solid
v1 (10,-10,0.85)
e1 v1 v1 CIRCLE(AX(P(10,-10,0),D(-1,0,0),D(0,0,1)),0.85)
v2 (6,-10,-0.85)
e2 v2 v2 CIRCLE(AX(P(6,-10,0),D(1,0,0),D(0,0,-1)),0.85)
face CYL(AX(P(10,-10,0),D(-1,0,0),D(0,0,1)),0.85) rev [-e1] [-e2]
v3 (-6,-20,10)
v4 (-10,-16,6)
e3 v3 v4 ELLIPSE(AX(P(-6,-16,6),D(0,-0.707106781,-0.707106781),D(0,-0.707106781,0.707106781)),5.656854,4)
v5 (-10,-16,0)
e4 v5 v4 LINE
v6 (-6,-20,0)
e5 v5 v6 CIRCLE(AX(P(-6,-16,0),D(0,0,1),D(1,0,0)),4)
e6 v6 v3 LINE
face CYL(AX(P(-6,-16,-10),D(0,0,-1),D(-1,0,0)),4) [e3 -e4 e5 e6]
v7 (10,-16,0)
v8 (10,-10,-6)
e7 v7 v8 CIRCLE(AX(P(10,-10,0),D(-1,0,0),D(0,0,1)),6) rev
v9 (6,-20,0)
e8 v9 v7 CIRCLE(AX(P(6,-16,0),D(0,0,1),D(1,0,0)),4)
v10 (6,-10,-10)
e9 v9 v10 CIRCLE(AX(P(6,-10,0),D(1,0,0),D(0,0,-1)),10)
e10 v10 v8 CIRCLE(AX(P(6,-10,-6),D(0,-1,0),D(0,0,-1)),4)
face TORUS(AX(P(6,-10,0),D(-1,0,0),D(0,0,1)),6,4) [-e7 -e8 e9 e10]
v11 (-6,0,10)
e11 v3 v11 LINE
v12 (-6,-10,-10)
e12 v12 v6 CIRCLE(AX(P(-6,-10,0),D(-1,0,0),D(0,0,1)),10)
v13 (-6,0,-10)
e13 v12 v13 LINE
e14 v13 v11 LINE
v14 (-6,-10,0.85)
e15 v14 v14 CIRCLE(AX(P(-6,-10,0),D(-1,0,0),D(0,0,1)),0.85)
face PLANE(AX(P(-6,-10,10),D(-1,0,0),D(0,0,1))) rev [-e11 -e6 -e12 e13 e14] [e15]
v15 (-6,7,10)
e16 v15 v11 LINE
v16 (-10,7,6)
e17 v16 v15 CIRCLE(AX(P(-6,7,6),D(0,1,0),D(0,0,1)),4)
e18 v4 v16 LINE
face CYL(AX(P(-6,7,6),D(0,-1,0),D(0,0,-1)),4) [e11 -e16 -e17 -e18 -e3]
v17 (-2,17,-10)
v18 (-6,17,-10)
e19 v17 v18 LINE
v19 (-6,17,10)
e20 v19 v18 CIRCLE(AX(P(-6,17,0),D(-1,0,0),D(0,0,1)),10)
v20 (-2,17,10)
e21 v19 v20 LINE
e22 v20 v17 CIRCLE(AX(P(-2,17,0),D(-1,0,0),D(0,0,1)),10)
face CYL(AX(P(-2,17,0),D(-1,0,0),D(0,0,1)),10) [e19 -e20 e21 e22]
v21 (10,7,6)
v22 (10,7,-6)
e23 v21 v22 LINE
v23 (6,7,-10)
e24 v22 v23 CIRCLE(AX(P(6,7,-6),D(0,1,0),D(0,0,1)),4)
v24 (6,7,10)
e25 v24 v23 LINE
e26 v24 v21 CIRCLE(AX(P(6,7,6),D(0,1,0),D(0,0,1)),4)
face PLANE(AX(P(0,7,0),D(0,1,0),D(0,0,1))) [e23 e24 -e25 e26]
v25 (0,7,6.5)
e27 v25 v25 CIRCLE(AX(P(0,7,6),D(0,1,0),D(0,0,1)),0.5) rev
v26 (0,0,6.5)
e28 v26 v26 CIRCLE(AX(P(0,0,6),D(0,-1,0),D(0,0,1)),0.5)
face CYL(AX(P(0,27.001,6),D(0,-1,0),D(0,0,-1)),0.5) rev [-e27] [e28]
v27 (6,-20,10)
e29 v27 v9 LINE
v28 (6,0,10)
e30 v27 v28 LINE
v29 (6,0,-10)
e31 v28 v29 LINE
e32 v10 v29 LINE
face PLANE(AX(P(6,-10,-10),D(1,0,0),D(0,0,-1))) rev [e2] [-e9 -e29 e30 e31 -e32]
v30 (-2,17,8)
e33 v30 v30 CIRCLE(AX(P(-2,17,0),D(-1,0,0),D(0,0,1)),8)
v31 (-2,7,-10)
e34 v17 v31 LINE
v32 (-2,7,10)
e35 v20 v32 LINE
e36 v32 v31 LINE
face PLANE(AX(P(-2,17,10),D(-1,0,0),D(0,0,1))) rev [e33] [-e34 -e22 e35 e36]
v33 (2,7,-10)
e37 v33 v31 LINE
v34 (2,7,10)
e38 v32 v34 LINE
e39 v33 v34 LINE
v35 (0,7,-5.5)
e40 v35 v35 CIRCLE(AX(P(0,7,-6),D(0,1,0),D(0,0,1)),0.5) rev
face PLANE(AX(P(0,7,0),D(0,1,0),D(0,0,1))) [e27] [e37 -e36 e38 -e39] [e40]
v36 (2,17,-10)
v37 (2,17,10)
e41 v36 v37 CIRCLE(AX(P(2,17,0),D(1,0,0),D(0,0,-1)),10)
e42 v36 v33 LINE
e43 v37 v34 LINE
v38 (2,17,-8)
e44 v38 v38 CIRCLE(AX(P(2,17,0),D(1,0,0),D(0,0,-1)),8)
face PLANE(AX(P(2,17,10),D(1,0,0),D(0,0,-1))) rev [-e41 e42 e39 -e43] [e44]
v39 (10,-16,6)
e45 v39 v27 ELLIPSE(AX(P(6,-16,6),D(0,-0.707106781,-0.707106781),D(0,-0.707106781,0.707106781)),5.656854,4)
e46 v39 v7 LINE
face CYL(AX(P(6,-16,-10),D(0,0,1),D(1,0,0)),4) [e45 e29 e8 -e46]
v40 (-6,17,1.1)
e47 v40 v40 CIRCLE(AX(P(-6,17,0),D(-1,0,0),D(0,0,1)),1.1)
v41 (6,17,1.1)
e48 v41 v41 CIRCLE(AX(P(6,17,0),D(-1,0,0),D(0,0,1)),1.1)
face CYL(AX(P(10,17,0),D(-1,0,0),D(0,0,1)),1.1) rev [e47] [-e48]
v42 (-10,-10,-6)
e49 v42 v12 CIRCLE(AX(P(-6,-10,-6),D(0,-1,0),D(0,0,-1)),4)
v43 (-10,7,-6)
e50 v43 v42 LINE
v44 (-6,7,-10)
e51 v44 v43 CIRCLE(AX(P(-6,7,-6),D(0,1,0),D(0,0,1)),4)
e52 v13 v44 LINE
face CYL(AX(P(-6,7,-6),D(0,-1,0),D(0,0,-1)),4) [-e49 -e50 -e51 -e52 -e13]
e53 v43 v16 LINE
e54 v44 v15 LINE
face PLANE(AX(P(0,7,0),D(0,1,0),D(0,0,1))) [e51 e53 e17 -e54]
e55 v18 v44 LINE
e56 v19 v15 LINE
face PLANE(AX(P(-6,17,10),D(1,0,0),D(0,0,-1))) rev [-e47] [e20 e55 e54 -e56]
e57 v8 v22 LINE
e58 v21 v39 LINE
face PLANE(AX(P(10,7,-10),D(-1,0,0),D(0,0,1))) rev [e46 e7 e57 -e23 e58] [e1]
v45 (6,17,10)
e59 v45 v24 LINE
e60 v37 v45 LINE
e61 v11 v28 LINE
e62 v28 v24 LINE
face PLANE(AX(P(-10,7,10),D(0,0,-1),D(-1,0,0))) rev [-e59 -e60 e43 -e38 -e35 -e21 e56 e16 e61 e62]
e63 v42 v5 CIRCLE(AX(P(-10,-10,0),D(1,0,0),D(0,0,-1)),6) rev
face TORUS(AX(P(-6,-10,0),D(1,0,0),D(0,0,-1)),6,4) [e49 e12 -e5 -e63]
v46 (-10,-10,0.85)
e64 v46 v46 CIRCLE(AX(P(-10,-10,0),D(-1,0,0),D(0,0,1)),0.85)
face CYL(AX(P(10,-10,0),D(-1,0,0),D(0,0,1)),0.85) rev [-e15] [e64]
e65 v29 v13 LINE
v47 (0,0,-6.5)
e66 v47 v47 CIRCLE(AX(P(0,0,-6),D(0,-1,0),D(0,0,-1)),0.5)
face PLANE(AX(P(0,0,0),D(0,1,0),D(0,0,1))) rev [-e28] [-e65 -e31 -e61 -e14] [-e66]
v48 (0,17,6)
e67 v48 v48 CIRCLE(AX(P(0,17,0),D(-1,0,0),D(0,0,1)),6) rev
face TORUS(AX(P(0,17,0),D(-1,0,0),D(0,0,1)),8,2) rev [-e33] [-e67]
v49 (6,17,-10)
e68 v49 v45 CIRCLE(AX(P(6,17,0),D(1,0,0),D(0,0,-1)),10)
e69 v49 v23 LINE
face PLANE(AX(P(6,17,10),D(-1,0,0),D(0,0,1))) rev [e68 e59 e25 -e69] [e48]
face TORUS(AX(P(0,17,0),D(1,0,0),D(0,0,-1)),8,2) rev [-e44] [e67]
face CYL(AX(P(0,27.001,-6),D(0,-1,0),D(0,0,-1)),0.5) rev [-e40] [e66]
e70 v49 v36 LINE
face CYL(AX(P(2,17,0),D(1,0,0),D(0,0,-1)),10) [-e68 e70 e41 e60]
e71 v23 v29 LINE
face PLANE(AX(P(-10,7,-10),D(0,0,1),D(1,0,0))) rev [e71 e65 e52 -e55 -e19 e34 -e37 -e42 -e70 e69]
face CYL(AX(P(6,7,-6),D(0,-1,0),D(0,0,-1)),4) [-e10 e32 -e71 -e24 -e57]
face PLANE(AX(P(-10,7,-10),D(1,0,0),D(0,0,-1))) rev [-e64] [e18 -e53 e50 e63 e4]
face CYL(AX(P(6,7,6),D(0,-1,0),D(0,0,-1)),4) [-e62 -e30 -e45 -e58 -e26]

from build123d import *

# Parameters (mm, degrees)
SKETCH1_W           = 20
SKETCH1_H           = 20
BOSS_EXTRUDE1_DEPTH = 7
SKETCH4_W           = 4
SKETCH4_H           = 20
BOSS_EXTRUDE2_DEPTH = 10
BOSS_EXTRUDE3_DEPTH = 4
BOSS_EXTRUDE4_START = -4
BOSS_EXTRUDE4_DEPTH = 4
SKETCH7_R           = 0.85
CUT_EXTRUDE1_DEPTH  = 31
FILLET1_R           = 4
SKETCH8_W           = 4
SKETCH8_H           = 20
BOSS_EXTRUDE5_DEPTH = 10
SKETCH9_R           = 10
BOSS_EXTRUDE6_DEPTH = 4
BOSS_EXTRUDE7_START = -4
SKETCH10_R          = 10
BOSS_EXTRUDE7_DEPTH = 4
SKETCH12_R          = 1.1
CUT_EXTRUDE2_DEPTH  = 33.939338184
SKETCH13_R          = 6
BOSS_EXTRUDE8_DEPTH = 4
SKETCH14_R          = 1.1
CUT_EXTRUDE3_DEPTH  = 4
FILLET2_R           = 2
CUT_EXTRUDE4_REACH  = 32.48
SKETCH16_R          = 0.5


with BuildPart() as part:
    # Sketch1 → Boss-Extrude1 (new body)
    with BuildSketch(Plane(origin=(0, 0, 0), x_dir=(1, 0, 0), z_dir=(0, 1, 0))):
        Rectangle(SKETCH1_W, SKETCH1_H)
    extrude(amount=BOSS_EXTRUDE1_DEPTH)

    # Sketch4 → Boss-Extrude2 (add)
    with BuildSketch(Plane.XZ):
        with Locations((-8, 0)):
            Rectangle(SKETCH4_W, SKETCH4_H)
        with Locations((8, 0)):
            Rectangle(SKETCH4_W, SKETCH4_H)
    extrude(amount=BOSS_EXTRUDE2_DEPTH)

    # Sketch5 → Boss-Extrude3 (add)
    with BuildSketch(Plane.ZY.offset(10)):
        with BuildLine():
            Line((0, -20), (10, -20))
            Line((10, -20), (10, -10))
            ThreePointArc((10, -10), (-7.071067812, -2.928932188), (0, -20))
        make_face()
    extrude(amount=-BOSS_EXTRUDE3_DEPTH)

    # Sketch6 → Boss-Extrude4 (add)
    with BuildSketch(Plane(origin=(10, 0, 0), x_dir=(0, 0, -1), z_dir=(1, 0, 0)).offset(BOSS_EXTRUDE4_START)):
        with BuildLine():
            Line((0, -20), (-10, -20))
            Line((-10, -20), (-10, -10))
            ThreePointArc((-10, -10), (7.071067812, -2.928932188), (0, -20))
        make_face()
    extrude(amount=BOSS_EXTRUDE4_DEPTH)

    # Sketch7 → Cut-Extrude1 (cut, through all)
    with BuildSketch(Plane.ZY.offset(10)):
        with Locations((0, -10)):
            Circle(SKETCH7_R)
    extrude(amount=-CUT_EXTRUDE1_DEPTH, mode=Mode.SUBTRACT)

    # Fillet1
    fillet1_edges = [part.edges().sort_by_distance(p)[0] for p in [
        (-10, -6.5, 10),
        (-10, -17.071067812, -7.071067812),
        (10, -6.5, 10),
        (10, -17.071067812, -7.071067812),
        (-10, -1.5, -10),
        (10, -1.5, -10),
        (10, -20, 5),
        (-10, -20, 5),
    ]]
    fillet(fillet1_edges, radius=FILLET1_R - 0.0001)  # a hair under: the kernel refuses the full size

    # Sketch8 → Boss-Extrude5 (add)
    with BuildSketch(Plane(origin=(0, 7, 0), x_dir=(1, 0, 0), z_dir=(0, 1, 0))):
        with Locations((4, 0)):
            Rectangle(SKETCH8_W, SKETCH8_H)
        with Locations((-4, 0)):
            Rectangle(SKETCH8_W, SKETCH8_H)
    extrude(amount=BOSS_EXTRUDE5_DEPTH)

    # Sketch9 → Boss-Extrude6 (add)
    with BuildSketch(Plane(origin=(6, 0, 0), x_dir=(0, 0, -1), z_dir=(1, 0, 0))):
        with Locations((0, 17)):
            Circle(SKETCH9_R)
    extrude(amount=-BOSS_EXTRUDE6_DEPTH)

    # Sketch10 → Boss-Extrude7 (add)
    with BuildSketch(Plane.ZY.offset(6).offset(BOSS_EXTRUDE7_START)):
        with Locations((0, 17)):
            Circle(SKETCH10_R)
    extrude(amount=BOSS_EXTRUDE7_DEPTH)

    # Sketch12 → Cut-Extrude2 (cut, through all)
    with BuildSketch(Plane.ZY.offset(6)):
        with Locations((0, 17)):
            Circle(SKETCH12_R)
    extrude(amount=-CUT_EXTRUDE2_DEPTH, mode=Mode.SUBTRACT)

    # Sketch13 → Boss-Extrude8 (add)
    with BuildSketch(Plane(origin=(-2, 0, 0), x_dir=(0, 0, -1), z_dir=(1, 0, 0))):
        with Locations(Location((0, 17, 0), (0, 0, 180))):
            Circle(SKETCH13_R)
    extrude(amount=BOSS_EXTRUDE8_DEPTH)

    # Sketch14 → Cut-Extrude3 (cut)
    with BuildSketch(Plane(origin=(-2, 0, 0), x_dir=(0, 0, -1), z_dir=(1, 0, 0))):
        with Locations(Location((0, 17, 0), (0, 0, 180))):
            Circle(SKETCH14_R)
    extrude(amount=CUT_EXTRUDE3_DEPTH, mode=Mode.SUBTRACT)

    # Fillet2
    fillet2_edges = [part.edges().sort_by_distance(p)[0] for p in [
        (-2, 17, -6),
        (2, 17, -6),
    ]]
    fillet(fillet2_edges, radius=FILLET2_R - 0.0001)  # a hair under: the kernel refuses the full size

    # Sketch16 → Cut-Extrude4 (cut, up to next)
    with BuildSketch(Plane.XZ, mode=Mode.PRIVATE) as cut_extrude4_sk1:
        with Locations(Location((0, -6, 0), (0, 0, 270))):
            Circle(SKETCH16_R)
    cut_extrude4_tool1 = extrude(cut_extrude4_sk1.sketch, amount=-CUT_EXTRUDE4_REACH, mode=Mode.PRIVATE) & part.part
    # Sketch16 → Cut-Extrude4 (cut, up to next)
    with BuildSketch(Plane.XZ, mode=Mode.PRIVATE) as cut_extrude4_sk2:
        with Locations(Location((0, 6, 0), (0, 0, 90))):
            Circle(SKETCH16_R)
    cut_extrude4_tool2 = extrude(cut_extrude4_sk2.sketch, amount=-CUT_EXTRUDE4_REACH, mode=Mode.PRIVATE) & part.part
    add(cut_extrude4_tool1.solids().sort_by_distance((0, 0, -6))[0], mode=Mode.SUBTRACT)
    add(cut_extrude4_tool2.solids().sort_by_distance((0, 0, 6))[0], mode=Mode.SUBTRACT)


solid = part.part
